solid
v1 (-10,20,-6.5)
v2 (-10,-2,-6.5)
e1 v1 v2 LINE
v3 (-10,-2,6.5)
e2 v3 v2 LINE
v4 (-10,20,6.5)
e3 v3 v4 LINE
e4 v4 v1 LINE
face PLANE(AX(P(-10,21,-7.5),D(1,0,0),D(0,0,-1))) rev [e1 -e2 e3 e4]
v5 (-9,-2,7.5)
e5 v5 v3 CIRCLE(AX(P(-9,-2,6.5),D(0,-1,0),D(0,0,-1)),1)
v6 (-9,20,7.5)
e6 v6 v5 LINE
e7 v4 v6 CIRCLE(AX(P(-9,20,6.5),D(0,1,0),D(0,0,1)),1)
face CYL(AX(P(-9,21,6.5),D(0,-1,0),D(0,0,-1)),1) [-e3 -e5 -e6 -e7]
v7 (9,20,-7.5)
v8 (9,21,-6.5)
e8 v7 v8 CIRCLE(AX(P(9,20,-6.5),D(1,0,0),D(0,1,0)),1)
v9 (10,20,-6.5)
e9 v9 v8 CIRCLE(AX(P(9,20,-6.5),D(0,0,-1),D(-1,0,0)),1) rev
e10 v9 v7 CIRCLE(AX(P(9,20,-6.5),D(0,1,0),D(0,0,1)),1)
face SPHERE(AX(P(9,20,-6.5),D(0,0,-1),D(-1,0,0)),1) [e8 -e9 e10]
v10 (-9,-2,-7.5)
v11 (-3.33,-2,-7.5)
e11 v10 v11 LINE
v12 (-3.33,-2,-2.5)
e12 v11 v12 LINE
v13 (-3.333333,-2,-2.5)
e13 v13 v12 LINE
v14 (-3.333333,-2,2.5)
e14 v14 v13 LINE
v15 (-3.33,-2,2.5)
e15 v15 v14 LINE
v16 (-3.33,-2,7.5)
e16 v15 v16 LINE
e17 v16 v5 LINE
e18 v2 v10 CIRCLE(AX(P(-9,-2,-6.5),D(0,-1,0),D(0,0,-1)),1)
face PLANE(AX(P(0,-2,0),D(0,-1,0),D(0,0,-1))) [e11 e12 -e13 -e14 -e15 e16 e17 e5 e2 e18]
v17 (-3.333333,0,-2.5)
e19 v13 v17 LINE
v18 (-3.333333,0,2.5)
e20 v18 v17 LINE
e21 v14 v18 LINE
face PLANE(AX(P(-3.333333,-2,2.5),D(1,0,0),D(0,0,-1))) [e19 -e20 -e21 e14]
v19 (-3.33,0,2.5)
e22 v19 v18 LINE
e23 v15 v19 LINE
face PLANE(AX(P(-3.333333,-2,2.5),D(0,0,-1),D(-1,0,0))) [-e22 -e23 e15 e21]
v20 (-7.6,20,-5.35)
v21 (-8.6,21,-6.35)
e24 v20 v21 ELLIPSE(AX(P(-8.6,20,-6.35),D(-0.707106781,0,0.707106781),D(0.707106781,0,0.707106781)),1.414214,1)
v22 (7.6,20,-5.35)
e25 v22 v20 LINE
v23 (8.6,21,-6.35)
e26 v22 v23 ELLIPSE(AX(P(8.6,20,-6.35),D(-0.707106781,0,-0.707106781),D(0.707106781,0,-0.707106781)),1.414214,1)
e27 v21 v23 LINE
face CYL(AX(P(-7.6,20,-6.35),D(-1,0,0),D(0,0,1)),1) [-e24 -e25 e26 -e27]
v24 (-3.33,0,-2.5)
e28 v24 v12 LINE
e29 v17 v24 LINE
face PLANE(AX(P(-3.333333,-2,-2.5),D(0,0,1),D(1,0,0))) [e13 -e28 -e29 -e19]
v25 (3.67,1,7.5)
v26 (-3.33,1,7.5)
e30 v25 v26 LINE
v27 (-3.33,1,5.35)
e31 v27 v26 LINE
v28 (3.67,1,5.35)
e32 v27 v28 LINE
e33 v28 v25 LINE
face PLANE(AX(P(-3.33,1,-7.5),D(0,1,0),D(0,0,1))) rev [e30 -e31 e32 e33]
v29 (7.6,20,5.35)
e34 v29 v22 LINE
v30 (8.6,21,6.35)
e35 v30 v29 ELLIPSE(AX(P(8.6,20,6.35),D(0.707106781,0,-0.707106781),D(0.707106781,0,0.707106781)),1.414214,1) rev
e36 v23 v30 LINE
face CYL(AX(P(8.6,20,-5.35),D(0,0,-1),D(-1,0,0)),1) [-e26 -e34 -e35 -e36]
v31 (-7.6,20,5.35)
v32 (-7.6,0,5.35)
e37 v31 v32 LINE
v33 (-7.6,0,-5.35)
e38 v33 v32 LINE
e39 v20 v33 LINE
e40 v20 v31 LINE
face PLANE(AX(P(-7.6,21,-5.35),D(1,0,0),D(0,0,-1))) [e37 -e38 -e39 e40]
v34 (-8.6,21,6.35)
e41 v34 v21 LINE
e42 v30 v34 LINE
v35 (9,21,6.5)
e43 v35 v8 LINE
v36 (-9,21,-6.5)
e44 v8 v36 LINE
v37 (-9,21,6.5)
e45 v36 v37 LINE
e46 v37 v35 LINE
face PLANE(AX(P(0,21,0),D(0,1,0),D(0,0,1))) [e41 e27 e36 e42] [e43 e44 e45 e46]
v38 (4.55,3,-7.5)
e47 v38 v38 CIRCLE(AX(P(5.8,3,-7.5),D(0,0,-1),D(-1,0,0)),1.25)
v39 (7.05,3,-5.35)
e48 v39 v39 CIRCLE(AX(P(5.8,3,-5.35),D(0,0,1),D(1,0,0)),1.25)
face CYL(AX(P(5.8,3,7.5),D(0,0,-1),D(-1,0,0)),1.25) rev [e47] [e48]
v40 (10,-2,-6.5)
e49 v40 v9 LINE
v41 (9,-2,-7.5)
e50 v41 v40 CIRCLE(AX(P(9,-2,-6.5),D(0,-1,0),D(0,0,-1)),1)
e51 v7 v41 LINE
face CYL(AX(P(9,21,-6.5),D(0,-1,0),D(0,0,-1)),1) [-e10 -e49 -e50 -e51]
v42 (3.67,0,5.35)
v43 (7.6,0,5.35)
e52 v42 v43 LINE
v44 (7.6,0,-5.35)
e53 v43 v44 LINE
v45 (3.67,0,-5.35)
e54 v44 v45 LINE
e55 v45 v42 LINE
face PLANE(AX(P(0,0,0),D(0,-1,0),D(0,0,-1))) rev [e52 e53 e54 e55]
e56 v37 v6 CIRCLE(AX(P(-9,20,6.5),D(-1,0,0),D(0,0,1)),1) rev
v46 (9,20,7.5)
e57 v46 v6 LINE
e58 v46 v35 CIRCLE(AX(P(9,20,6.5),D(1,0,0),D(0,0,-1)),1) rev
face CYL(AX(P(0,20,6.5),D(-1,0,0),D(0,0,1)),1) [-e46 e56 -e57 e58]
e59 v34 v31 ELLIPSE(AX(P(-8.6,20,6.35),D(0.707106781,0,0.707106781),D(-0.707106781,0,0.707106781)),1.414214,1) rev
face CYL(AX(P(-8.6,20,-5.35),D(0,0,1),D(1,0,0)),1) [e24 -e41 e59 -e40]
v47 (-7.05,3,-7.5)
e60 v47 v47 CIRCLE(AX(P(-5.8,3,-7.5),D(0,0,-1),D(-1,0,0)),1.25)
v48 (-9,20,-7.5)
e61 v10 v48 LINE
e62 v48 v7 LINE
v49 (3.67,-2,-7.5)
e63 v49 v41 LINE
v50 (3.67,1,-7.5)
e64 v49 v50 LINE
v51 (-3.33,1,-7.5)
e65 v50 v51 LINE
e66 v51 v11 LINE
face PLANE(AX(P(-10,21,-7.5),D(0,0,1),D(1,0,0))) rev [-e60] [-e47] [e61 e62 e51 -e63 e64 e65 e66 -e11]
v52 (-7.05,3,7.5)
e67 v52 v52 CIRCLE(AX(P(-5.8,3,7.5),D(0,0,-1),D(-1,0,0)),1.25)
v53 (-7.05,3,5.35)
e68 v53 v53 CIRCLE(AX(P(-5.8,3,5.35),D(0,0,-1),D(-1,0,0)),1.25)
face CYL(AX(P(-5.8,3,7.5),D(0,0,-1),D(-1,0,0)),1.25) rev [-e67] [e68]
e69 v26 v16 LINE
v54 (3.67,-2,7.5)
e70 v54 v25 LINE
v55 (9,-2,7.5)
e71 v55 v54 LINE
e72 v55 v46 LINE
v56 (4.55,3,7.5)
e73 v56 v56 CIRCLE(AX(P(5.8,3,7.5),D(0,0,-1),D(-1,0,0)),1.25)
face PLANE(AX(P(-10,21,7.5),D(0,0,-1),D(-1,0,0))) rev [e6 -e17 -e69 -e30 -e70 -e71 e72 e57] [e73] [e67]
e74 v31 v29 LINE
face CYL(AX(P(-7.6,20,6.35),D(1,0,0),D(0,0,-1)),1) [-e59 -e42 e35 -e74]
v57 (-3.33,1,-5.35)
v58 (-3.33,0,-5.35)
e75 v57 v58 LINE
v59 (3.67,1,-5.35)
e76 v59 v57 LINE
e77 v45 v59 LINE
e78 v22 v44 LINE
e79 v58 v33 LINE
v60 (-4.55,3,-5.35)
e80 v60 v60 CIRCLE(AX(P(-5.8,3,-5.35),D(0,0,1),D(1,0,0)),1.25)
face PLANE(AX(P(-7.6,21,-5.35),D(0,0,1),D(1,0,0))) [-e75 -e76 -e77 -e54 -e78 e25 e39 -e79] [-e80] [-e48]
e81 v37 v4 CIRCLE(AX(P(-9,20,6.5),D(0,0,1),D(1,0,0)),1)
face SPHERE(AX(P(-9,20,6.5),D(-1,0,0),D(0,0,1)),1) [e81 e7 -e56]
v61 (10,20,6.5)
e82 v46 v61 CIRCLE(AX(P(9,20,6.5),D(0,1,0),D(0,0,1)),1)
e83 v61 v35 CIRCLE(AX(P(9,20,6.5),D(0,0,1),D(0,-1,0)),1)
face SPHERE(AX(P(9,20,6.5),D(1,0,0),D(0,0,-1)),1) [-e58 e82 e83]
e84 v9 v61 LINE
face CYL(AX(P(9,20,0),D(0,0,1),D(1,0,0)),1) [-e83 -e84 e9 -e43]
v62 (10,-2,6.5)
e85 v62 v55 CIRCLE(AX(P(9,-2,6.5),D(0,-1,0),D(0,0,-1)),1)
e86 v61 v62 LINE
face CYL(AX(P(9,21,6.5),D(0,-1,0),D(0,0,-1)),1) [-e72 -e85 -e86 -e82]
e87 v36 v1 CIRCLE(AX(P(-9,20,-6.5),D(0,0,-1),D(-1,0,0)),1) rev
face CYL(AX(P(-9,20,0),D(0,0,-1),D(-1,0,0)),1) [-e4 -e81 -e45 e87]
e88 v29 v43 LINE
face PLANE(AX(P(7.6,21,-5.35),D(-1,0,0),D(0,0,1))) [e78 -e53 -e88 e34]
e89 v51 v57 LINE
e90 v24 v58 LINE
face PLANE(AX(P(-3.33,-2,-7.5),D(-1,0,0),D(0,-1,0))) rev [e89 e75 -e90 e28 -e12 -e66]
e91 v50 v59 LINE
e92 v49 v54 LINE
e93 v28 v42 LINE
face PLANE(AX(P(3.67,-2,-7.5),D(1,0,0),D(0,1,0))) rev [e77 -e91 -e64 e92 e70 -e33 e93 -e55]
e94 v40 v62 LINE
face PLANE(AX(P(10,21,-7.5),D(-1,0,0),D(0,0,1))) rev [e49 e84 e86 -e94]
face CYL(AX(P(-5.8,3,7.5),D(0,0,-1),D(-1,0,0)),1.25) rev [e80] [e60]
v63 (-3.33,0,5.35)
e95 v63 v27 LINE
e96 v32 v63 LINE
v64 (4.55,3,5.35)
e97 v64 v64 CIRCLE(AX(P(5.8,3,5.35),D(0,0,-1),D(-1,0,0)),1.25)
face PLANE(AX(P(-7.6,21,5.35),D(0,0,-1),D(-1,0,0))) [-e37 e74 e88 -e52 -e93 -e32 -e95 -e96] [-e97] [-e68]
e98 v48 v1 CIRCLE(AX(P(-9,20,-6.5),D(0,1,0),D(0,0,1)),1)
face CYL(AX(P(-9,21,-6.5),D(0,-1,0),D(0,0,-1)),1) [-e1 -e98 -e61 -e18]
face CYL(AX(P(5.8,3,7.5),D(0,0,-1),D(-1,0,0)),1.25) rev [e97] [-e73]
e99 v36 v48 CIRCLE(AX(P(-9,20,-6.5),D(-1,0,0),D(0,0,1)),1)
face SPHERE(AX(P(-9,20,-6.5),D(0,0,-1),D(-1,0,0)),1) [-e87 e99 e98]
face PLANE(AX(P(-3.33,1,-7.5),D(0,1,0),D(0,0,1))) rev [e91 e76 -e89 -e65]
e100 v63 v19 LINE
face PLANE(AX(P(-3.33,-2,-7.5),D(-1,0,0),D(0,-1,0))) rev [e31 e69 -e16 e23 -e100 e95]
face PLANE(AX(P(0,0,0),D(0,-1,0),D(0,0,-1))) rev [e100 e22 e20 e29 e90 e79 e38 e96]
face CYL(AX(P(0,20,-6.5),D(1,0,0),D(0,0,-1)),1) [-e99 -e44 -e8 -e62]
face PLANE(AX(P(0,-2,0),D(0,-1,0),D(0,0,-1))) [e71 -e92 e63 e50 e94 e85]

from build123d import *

# Parameters (mm, degrees)
SKETCH1_W           = 20
SKETCH1_H           = 15
SKETCH1_W_2         = 15.2
SKETCH1_H_2         = 10.7
BOSS_EXTRUDE1_DEPTH = 21
SKETCH2_W           = 20
SKETCH2_H           = 15
SKETCH2_W_2         = 6.666666666
SKETCH2_H_2         = 5
BOSS_EXTRUDE2_DEPTH = 2
HOLE1_START         = -7.5
HOLE1_OUTLINE_R     = 1.25
HOLE1_DEPTH         = 15
FILLET1_R           = 1
SKETCH4_W           = 7
SKETCH4_H           = 3
CUT_EXTRUDE1_DEPTH  = 28.676705006


# Read off the part's stored shape, not the designer's step: Hole1
with BuildPart() as part:
    # Sketch1 → Boss-Extrude1 (new body)
    with BuildSketch(Plane(origin=(0, 0, 0), x_dir=(1, 0, 0), z_dir=(0, 1, 0))):
        Rectangle(SKETCH1_W, SKETCH1_H)
        Rectangle(SKETCH1_W_2, SKETCH1_H_2, mode=Mode.SUBTRACT)
    extrude(amount=BOSS_EXTRUDE1_DEPTH)

    # Sketch2 → Boss-Extrude2 (add)
    with BuildSketch(Plane.XZ):
        Rectangle(SKETCH2_W, SKETCH2_H)
        Rectangle(SKETCH2_W_2, SKETCH2_H_2, mode=Mode.SUBTRACT)
    extrude(amount=BOSS_EXTRUDE2_DEPTH)

    # Hole1 outline → Hole1 (cut)
    with BuildSketch(Plane.XY.offset(HOLE1_START)):
        with Locations((5.8, 3)):
            Circle(HOLE1_OUTLINE_R)
        with Locations((-5.8, 3)):
            Circle(HOLE1_OUTLINE_R)
    extrude(amount=HOLE1_DEPTH, mode=Mode.SUBTRACT)

    # Fillet1
    fillet1_edges = [part.edges().sort_by_distance(p)[0] for p in [
        (-10, 21, 0),
        (7.6, 21, 0),
        (0, 21, 7.5),
        (0, 21, -5.35),
        (-7.6, 21, 0),
        (0, 21, 5.35),
        (10, 21, 0),
        (10, 9.5, 7.5),
        (-10, 9.5, 7.5),
        (-10, 9.5, -7.5),
        (10, 9.5, -7.5),
        (0, 21, -7.5),
    ]]
    fillet(fillet1_edges, radius=FILLET1_R)

    # Sketch4 → Cut-Extrude1 (cut, through all)
    with BuildSketch(Plane.XY.offset(7.5)):
        with Locations((0.17, -0.5)):
            Rectangle(SKETCH4_W, SKETCH4_H)
    extrude(amount=-CUT_EXTRUDE1_DEPTH, mode=Mode.SUBTRACT)


solid = part.part
